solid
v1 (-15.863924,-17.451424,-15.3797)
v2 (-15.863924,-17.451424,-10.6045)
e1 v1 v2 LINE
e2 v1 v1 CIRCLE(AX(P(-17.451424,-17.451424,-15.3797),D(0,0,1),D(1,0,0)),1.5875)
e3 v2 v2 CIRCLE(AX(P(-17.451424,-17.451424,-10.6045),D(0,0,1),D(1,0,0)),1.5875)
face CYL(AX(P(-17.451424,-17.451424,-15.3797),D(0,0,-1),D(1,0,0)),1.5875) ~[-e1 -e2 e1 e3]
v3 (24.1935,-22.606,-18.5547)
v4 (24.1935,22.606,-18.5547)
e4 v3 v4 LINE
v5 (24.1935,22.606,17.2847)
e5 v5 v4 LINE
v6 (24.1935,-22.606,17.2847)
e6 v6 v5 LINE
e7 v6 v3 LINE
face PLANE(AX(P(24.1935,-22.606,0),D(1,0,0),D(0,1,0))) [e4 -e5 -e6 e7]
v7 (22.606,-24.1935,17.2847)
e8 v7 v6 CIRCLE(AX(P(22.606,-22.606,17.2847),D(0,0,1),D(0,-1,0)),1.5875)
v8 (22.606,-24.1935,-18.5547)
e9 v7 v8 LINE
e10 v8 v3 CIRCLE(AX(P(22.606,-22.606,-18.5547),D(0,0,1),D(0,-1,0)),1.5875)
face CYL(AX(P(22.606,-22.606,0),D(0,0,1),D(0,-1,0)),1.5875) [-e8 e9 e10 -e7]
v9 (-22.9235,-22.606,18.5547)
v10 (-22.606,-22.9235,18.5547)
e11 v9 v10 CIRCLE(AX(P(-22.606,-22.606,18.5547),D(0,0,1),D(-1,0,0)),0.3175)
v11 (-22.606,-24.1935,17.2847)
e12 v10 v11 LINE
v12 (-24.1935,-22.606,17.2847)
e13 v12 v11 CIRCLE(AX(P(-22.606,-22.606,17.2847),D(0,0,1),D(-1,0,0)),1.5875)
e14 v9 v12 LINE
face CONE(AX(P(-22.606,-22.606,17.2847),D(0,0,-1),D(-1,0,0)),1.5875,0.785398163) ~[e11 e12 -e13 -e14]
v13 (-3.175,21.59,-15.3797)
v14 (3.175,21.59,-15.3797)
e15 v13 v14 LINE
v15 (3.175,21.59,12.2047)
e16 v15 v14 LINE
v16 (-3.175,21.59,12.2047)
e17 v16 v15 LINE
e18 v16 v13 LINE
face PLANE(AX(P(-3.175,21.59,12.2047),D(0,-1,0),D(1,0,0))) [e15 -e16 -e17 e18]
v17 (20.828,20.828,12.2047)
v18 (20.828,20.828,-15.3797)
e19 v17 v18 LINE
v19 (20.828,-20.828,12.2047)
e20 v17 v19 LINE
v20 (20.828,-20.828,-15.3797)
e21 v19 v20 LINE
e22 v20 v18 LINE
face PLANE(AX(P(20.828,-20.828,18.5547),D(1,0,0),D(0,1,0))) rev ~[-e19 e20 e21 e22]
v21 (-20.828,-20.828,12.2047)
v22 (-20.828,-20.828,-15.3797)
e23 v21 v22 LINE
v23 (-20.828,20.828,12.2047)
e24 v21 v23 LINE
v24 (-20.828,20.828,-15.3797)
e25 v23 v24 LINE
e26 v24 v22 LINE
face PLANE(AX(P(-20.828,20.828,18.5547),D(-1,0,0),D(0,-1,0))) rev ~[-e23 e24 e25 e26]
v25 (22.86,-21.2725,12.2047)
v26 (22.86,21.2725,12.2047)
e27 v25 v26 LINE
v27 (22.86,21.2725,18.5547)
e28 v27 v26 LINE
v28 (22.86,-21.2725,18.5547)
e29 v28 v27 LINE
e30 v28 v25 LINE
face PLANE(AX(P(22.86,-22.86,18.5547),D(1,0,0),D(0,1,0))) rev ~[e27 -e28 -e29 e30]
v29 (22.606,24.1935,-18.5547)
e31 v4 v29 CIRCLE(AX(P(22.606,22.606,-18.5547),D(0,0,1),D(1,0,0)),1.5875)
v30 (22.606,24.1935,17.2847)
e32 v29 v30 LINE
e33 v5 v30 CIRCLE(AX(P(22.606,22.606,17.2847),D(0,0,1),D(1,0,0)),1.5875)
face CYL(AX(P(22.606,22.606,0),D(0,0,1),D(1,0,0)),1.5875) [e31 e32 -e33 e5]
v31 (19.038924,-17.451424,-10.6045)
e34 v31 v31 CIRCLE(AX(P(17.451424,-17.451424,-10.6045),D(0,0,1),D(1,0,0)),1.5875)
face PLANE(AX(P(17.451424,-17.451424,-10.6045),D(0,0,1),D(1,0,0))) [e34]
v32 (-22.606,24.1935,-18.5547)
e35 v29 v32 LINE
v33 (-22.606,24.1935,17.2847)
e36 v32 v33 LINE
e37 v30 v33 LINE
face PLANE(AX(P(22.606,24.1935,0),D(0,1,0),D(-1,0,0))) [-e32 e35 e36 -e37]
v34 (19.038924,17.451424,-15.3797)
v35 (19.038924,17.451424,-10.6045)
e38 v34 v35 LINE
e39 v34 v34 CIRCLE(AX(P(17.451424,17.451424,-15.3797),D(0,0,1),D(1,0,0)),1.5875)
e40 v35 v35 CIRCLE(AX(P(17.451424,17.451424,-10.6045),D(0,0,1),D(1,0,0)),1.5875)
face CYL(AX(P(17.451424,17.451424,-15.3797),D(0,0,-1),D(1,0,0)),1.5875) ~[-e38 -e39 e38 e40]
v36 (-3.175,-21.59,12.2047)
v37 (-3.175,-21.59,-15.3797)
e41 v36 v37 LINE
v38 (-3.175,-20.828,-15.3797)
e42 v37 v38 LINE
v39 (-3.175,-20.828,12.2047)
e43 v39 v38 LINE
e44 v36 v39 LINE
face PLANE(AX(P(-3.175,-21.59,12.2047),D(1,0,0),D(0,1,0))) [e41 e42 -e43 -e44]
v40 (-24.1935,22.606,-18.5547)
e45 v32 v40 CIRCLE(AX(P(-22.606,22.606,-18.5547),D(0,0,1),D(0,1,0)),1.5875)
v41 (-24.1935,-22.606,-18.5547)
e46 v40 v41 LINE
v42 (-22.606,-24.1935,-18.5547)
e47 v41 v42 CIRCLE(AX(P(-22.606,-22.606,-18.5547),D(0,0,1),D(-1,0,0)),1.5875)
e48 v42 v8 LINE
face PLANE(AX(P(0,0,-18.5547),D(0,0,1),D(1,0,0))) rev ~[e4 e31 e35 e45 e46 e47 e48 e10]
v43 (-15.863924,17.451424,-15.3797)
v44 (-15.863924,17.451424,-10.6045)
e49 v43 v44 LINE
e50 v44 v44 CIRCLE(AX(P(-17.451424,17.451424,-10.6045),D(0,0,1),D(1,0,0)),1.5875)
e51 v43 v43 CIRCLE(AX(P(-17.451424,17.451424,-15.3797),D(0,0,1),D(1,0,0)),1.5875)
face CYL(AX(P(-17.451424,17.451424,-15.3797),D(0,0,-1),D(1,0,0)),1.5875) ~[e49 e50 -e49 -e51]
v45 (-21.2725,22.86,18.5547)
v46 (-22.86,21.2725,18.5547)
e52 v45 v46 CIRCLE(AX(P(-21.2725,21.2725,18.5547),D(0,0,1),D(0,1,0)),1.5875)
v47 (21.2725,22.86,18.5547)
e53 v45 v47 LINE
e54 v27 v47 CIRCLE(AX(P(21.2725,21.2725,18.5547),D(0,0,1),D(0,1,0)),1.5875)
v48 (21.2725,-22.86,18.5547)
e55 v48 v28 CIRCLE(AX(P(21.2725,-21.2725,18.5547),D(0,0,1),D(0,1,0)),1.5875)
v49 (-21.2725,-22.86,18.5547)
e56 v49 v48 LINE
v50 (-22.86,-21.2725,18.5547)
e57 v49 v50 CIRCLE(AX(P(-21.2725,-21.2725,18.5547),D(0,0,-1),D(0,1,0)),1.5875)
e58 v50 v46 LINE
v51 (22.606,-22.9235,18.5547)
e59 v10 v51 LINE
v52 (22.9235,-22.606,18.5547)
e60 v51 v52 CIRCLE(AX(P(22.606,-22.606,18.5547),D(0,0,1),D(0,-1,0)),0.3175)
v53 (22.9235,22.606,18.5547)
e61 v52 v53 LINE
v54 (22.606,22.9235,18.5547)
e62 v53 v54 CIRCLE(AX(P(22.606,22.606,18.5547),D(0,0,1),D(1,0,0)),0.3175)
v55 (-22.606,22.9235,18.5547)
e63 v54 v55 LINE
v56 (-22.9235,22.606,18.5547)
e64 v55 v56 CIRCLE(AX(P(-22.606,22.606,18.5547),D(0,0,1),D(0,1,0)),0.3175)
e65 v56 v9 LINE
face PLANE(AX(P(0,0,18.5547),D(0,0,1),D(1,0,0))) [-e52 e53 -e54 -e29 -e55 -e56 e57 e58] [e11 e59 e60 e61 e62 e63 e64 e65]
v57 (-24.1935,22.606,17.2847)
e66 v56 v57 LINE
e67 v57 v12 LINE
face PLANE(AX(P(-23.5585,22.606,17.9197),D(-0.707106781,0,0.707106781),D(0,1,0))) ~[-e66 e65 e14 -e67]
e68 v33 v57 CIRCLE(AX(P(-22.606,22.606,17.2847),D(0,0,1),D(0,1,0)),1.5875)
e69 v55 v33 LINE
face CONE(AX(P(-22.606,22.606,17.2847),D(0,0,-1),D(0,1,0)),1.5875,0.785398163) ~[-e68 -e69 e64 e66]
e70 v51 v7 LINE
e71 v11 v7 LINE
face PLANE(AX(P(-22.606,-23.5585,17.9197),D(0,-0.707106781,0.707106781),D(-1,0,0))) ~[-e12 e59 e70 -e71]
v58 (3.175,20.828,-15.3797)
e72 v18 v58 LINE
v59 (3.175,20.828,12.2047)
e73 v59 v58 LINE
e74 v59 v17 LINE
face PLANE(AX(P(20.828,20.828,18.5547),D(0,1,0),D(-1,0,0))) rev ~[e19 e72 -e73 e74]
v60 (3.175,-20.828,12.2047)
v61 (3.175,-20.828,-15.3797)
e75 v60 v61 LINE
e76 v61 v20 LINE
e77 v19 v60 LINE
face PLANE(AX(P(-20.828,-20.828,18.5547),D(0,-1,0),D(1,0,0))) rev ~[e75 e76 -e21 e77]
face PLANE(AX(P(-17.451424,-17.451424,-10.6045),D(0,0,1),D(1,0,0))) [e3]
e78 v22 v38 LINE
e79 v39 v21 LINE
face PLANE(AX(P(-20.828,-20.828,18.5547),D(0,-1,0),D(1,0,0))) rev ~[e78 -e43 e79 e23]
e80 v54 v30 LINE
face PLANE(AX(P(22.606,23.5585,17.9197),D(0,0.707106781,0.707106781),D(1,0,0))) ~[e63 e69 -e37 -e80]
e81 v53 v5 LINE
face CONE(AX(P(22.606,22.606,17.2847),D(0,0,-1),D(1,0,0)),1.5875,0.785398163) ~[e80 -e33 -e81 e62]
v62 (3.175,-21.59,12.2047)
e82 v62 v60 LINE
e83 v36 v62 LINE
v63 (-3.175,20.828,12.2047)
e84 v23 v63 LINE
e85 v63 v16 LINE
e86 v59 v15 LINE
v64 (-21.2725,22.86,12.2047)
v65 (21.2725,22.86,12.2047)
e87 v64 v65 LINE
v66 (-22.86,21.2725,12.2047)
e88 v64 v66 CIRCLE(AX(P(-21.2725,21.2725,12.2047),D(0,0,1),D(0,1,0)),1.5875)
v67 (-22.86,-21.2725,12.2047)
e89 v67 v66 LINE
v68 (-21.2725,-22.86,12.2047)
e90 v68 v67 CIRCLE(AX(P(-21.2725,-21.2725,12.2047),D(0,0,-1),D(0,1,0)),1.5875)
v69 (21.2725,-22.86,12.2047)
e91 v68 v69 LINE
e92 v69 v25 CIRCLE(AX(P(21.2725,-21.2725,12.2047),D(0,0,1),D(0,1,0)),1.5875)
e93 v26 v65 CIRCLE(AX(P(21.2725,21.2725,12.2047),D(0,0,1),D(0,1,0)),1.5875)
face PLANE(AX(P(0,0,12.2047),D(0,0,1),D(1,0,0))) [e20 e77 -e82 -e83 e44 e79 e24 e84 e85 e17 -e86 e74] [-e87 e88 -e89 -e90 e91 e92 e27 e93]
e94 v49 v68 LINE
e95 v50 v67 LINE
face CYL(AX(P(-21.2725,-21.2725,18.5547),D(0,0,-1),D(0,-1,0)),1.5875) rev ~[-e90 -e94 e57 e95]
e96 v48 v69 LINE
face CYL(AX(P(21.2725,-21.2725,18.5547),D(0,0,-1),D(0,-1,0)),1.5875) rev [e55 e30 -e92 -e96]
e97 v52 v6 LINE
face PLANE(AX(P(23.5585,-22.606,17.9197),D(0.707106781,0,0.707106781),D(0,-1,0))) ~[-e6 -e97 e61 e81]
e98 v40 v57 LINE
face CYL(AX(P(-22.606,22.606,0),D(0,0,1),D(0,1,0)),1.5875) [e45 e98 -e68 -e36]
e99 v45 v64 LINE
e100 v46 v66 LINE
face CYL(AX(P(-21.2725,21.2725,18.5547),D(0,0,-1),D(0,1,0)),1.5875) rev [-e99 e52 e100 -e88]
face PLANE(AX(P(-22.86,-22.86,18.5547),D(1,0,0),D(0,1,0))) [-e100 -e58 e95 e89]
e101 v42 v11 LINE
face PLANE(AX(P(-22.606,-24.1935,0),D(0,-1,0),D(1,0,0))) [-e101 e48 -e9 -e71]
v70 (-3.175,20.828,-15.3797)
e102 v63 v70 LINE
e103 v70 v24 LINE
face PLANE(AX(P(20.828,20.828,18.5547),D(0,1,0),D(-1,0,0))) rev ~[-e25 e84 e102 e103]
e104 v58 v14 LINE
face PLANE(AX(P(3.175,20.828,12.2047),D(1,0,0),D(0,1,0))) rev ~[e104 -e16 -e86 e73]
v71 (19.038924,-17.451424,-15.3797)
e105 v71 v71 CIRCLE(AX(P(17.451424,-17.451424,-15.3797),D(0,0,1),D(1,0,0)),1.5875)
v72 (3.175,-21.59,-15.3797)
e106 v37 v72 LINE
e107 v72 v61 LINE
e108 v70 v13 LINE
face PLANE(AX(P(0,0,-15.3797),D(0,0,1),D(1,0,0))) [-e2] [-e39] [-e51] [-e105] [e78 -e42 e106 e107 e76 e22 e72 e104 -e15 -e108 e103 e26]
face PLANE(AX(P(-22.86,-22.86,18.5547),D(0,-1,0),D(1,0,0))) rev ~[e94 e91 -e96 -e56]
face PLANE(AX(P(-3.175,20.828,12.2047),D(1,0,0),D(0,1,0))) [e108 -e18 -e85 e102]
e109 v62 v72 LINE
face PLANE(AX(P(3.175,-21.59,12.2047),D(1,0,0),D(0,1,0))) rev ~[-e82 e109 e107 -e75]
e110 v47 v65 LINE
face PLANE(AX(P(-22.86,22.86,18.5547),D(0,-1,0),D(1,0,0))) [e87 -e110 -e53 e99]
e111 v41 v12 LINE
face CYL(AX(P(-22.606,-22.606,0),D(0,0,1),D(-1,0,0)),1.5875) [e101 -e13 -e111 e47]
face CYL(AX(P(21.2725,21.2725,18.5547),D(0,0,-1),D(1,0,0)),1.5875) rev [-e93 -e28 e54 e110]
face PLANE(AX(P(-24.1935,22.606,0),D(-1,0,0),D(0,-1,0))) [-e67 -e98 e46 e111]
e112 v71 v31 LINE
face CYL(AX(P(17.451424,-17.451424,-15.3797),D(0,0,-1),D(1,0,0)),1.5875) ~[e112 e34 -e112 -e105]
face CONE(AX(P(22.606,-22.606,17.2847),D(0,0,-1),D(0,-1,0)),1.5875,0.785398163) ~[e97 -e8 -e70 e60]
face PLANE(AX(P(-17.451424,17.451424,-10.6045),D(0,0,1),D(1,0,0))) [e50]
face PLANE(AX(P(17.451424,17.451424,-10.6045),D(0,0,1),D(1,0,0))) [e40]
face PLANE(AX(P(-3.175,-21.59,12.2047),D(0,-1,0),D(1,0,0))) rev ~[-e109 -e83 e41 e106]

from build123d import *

# Parameters (mm, degrees)
F1_DEPTH  = 18.5547
F3_DEPTH  = 33.9344
F4_W      = 45.72
F4_H      = 45.72
F5_DEPTH  = 6.35
F6_R      = 1.5875
F7_DEPTH  = 4.7752
F8_R      = 1.5875
F9_W      = 6.35
F9_H      = 0.762
F10_DEPTH = 27.5844
F11_SIZE  = 1.27


with BuildPart() as f1:
    # F0 (on Top) → F1 (new body, symmetric)
    with BuildSketch(Plane.XY):
        with BuildLine():
            ThreePointArc((24.1935, 22.606), (23.7285320151, 23.7285320151), (22.606, 24.1935))
            Line((22.606, 24.1935), (-22.606, 24.1935))
            ThreePointArc((-22.606, 24.1935), (-23.7285320151, 23.7285320151), (-24.1935, 22.606))
            Line((-24.1935, 22.606), (-24.1935, -22.606))
            ThreePointArc((-24.1935, -22.606), (-23.7285320151, -23.7285320151), (-22.606, -24.1935))
            Line((-22.606, -24.1935), (22.606, -24.1935))
            ThreePointArc((22.606, -24.1935), (23.7285320151, -23.7285320151), (24.1935, -22.606))
            Line((24.1935, -22.606), (24.1935, 22.606))
        make_face()
    extrude(amount=F1_DEPTH, both=True)

    # F2 (on face) → F3 (cut)
    with BuildSketch(Plane.XY.offset(18.5547)):
        Polygon((20.828, -20.3835), (20.828, 20.3835), (20.828, 20.828), (20.3835, 20.828), (-20.3835, 20.828), (-20.828, 20.828), (-20.828, 20.3835), (-20.828, -20.3835), (-20.828, -20.828), (-20.3835, -20.828), (20.3835, -20.828), (20.828, -20.828), align=None)
    extrude(amount=-F3_DEPTH, mode=Mode.SUBTRACT)

    # F4 (on face) → F5 (cut)
    with BuildSketch(Plane.XY.offset(18.5547)):
        Rectangle(F4_W, F4_H)
    extrude(amount=-F5_DEPTH, mode=Mode.SUBTRACT)

    # F6 (on face) → F7 (join)
    with BuildSketch(Plane.XY.offset(-15.3797)):
        with Locations((17.4514236985, -17.4514236985)):
            Circle(F6_R)
        with Locations((-17.4514236985, -17.4514236985)):
            Circle(F6_R)
        with Locations((-17.4514236985, 17.4514236985)):
            Circle(F6_R)
        with Locations((17.4514236985, 17.4514236985)):
            Circle(F6_R)
    extrude(amount=F7_DEPTH)

    # F8
    f8_edges = [f1.edges().sort_by_distance(p)[0] for p in [
        (22.86, 22.86, 15.3797),
        (-22.86, 22.86, 15.3797),
        (-22.86, -22.86, 15.3797),
        (22.86, -22.86, 15.3797),
    ]]
    fillet(f8_edges, radius=F8_R)

    # F9 (on face) → F10 (cut, through all)
    with BuildSketch(Plane.XY.offset(12.2047)):
        with Locations((0, 21.209)):
            Rectangle(F9_W, F9_H)
        with Locations((0, -21.209)):
            Rectangle(F9_W, F9_H)
    extrude(amount=-F10_DEPTH, mode=Mode.SUBTRACT)

    # F11
    f11_edges = [f1.edges().sort_by_distance(p)[0] for p in [
        (-23.728532, 23.728532, 18.5547),
        (-24.1935, 0, 18.5547),
        (-23.728532, -23.728532, 18.5547),
        (0, -24.1935, 18.5547),
        (23.728532, -23.728532, 18.5547),
        (24.1935, 0, 18.5547),
        (0, 24.1935, 18.5547),
    ]]
    chamfer(f11_edges, length=F11_SIZE)


solid = f1.part
